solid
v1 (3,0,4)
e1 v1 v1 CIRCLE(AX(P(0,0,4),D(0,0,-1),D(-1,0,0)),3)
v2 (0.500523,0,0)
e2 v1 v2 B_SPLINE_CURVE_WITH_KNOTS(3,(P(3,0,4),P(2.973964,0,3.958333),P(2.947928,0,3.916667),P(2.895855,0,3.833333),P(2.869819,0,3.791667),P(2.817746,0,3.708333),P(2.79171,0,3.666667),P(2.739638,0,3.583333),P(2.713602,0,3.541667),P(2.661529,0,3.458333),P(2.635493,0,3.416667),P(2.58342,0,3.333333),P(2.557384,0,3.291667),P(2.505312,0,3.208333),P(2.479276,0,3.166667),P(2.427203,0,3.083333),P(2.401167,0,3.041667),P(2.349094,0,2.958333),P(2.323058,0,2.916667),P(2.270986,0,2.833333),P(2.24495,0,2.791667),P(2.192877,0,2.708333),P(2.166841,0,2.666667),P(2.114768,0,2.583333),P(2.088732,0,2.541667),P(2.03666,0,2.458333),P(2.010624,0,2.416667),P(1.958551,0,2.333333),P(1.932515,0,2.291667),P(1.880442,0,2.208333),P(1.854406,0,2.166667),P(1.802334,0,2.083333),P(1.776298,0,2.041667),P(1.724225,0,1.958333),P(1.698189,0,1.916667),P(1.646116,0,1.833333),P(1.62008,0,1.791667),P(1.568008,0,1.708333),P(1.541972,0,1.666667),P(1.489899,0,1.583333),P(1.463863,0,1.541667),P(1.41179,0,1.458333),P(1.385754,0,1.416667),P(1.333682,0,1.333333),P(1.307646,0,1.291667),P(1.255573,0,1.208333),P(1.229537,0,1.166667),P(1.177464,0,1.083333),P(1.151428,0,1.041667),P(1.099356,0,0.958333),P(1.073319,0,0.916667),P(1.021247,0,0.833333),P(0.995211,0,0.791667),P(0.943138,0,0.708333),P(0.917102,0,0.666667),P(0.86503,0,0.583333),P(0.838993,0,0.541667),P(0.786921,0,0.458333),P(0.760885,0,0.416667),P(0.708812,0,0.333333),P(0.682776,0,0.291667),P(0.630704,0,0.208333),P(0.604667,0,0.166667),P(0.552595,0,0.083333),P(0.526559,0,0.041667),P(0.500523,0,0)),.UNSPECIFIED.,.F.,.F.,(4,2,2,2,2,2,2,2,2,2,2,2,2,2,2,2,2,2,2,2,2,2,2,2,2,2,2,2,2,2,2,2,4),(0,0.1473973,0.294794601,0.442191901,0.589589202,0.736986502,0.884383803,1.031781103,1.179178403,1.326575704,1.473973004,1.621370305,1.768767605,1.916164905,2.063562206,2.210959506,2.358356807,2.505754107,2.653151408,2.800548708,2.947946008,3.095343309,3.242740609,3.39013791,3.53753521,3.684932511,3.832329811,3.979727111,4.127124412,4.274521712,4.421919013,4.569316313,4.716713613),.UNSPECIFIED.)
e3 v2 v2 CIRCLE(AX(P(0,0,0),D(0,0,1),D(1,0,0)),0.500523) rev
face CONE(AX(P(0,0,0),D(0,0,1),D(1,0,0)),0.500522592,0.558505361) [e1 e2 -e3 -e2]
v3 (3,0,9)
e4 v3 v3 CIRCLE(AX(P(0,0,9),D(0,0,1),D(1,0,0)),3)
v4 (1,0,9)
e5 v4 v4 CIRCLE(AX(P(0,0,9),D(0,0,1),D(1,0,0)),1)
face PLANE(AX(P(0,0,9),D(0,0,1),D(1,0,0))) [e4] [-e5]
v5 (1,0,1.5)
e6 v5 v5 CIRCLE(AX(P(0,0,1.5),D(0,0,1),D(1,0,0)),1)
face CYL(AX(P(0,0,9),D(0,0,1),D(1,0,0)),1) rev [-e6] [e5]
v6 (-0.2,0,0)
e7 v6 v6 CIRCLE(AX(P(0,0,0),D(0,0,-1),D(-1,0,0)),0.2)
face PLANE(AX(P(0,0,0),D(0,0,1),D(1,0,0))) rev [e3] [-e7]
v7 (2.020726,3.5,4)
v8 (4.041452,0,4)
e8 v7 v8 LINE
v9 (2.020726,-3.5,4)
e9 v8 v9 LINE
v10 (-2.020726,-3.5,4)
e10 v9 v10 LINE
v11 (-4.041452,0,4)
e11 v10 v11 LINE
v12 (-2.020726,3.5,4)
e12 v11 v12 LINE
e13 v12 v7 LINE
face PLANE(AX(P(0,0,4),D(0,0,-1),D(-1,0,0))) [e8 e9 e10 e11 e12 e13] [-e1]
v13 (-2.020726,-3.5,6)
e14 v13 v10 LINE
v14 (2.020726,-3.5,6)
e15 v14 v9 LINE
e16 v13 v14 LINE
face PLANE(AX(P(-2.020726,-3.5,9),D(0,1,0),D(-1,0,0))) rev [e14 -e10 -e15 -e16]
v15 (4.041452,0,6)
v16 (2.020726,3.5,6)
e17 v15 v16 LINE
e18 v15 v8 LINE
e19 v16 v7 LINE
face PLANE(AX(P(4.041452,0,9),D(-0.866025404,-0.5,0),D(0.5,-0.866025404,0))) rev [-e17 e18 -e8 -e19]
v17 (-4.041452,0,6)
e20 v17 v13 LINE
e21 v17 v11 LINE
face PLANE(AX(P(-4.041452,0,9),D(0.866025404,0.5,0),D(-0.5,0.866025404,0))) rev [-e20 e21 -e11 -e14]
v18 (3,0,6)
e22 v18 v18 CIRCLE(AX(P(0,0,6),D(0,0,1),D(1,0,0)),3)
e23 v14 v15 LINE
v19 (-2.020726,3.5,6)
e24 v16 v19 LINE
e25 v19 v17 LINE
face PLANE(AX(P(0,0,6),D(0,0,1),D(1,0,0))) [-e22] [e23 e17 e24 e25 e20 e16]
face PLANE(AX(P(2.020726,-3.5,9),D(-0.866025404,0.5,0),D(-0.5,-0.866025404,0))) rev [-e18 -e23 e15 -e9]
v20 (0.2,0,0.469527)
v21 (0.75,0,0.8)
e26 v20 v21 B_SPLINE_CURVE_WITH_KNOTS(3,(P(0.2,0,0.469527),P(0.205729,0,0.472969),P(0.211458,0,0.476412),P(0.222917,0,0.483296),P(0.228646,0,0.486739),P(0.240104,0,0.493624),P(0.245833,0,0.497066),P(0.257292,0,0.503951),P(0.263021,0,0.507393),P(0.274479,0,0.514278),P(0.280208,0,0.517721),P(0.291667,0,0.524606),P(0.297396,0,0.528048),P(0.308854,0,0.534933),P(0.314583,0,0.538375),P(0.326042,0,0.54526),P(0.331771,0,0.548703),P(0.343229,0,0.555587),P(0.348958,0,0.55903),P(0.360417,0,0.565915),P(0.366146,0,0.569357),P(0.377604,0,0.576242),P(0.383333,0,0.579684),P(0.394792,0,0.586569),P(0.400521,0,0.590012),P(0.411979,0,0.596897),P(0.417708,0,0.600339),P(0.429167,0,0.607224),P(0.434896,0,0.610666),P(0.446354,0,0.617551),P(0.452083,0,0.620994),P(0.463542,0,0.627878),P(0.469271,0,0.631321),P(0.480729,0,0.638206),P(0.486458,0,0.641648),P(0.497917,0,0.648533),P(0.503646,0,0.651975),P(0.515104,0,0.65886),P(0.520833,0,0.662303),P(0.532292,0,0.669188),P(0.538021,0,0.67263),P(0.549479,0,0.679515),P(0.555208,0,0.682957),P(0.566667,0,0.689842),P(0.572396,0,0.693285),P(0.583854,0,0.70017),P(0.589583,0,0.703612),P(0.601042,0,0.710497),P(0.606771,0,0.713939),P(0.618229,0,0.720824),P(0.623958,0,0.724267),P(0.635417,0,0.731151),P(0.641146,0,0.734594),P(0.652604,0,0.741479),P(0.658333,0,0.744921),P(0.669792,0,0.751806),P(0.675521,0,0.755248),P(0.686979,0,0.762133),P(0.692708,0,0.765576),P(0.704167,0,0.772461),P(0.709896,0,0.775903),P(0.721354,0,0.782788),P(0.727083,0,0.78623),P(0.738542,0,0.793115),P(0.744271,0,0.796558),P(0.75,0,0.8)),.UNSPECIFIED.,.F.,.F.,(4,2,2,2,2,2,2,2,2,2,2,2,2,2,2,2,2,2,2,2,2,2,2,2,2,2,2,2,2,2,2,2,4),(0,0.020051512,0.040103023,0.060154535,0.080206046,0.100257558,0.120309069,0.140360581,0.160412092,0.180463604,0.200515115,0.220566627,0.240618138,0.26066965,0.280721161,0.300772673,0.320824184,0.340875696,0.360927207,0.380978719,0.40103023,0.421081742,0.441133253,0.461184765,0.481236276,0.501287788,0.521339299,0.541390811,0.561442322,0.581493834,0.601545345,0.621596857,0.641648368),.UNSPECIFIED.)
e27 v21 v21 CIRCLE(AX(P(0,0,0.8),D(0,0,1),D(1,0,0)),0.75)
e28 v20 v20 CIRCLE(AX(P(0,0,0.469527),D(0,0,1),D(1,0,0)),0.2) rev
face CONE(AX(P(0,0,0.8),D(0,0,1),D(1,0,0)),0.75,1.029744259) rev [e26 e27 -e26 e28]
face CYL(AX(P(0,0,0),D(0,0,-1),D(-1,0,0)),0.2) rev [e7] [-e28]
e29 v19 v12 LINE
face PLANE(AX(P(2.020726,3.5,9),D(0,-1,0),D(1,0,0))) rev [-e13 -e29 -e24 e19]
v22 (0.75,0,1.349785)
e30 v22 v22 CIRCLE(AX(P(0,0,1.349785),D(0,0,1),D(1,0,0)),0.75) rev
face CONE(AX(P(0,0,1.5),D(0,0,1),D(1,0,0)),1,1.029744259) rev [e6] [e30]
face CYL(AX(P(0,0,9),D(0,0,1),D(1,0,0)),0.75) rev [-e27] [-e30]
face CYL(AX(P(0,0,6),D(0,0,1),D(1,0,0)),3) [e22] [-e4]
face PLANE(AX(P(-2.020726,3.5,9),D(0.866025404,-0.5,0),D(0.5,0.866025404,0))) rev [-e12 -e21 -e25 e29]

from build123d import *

# Parameters (mm, degrees)
BOSS_EXTRU_1_DEPTH                  = 9
ESQUISSE2_W                         = 15.557161579
ESQUISSE2_H                         = 11.468773674
ESQUISSE2_R                         = 3
ENL_V_MAT_EXTRU_1_DEPTH             = 3
DIAM_TRE_DU_PER_AGE_2_0_2_1_D       = 2
DIAM_TRE_DU_PER_AGE_2_0_2_1_DEPTH   = 7.5
DIAM_TRE_DU_PER_AGE_2_0_2_1_TIP     = 0.600860619
DIAM_TRE_DU_PER_AGE_1_5_1_5_1_D     = 1.5
DIAM_TRE_DU_PER_AGE_1_5_1_5_1_DEPTH = 8.2
DIAM_TRE_DU_PER_AGE_1_5_1_5_1_TIP   = 0.450645464
DIAM_TRE_DU_PER_AGE_0_4_0_4_1_D     = 0.4
DIAM_TRE_DU_PER_AGE_0_4_0_4_1_DEPTH = 0.7
DIAM_TRE_DU_PER_AGE_0_4_0_4_1_TIP   = 0.120172124
ENL_V_START                         = -4
ESQUISSE3_W                         = 15.323034965
ESQUISSE3_H                         = 11.861185192
ESQUISSE3_R                         = 3
ENL_V_MAT_EXTRU_3_DEPTH             = 4
CHANFREIN2_SIZE                     = 4
CHANFREIN2_SIZE_2                   = 2.499477408


with BuildPart() as part:
    # Esquisse1 → Boss.-Extru.1 (new body)
    with BuildSketch(Plane.XY):
        Polygon((4.041451884, 0), (2.020725942, 3.5), (-2.020725942, 3.5), (-4.041451884, 0), (-2.020725942, -3.5), (2.020725942, -3.5), align=None)
    extrude(amount=BOSS_EXTRU_1_DEPTH)

    # Esquisse2 → Enlèv. mat.-Extru.1 (cut)
    with BuildSketch(Plane.XY.offset(9)):
        with Locations((-0.212602531, -0.232116366)):
            Rectangle(ESQUISSE2_W, ESQUISSE2_H)
        Circle(ESQUISSE2_R, mode=Mode.SUBTRACT)
    extrude(amount=-ENL_V_MAT_EXTRU_1_DEPTH, mode=Mode.SUBTRACT)

    # Diamètre du perçage Ø2.0 (2)1
    with Locations(Plane.XY.offset(9)):
        with Locations((0, 0)):
            Hole(DIAM_TRE_DU_PER_AGE_2_0_2_1_D / 2, depth=DIAM_TRE_DU_PER_AGE_2_0_2_1_DEPTH)
            with Locations((0, 0, -(DIAM_TRE_DU_PER_AGE_2_0_2_1_DEPTH + DIAM_TRE_DU_PER_AGE_2_0_2_1_TIP / 2))):  # 118° drill point
                Cone(0, DIAM_TRE_DU_PER_AGE_2_0_2_1_D / 2, DIAM_TRE_DU_PER_AGE_2_0_2_1_TIP, mode=Mode.SUBTRACT)

    # Diamètre du perçage Ø1.5 (1.5)1
    with Locations(Plane.XY.offset(9)):
        with Locations((0, 0)):
            Hole(DIAM_TRE_DU_PER_AGE_1_5_1_5_1_D / 2, depth=DIAM_TRE_DU_PER_AGE_1_5_1_5_1_DEPTH)
            with Locations((0, 0, -(DIAM_TRE_DU_PER_AGE_1_5_1_5_1_DEPTH + DIAM_TRE_DU_PER_AGE_1_5_1_5_1_TIP / 2))):  # 118° drill point
                Cone(0, DIAM_TRE_DU_PER_AGE_1_5_1_5_1_D / 2, DIAM_TRE_DU_PER_AGE_1_5_1_5_1_TIP, mode=Mode.SUBTRACT)

    # Diamètre du perçage Ø0.4 (0.4)1
    with Locations(Plane(origin=(0, 0, 0), x_dir=(-1, 0, 0), z_dir=(0, 0, -1))):
        with Locations((0, 0)):
            Hole(DIAM_TRE_DU_PER_AGE_0_4_0_4_1_D / 2, depth=DIAM_TRE_DU_PER_AGE_0_4_0_4_1_DEPTH)
            with Locations((0, 0, -(DIAM_TRE_DU_PER_AGE_0_4_0_4_1_DEPTH + DIAM_TRE_DU_PER_AGE_0_4_0_4_1_TIP / 2))):  # 118° drill point
                Cone(0, DIAM_TRE_DU_PER_AGE_0_4_0_4_1_D / 2, DIAM_TRE_DU_PER_AGE_0_4_0_4_1_TIP, mode=Mode.SUBTRACT)

    # Esquisse3 → Enlèv. mat.-Extru.3 (cut)
    with BuildSketch(Plane(origin=(0, 0, 0), x_dir=(-1, 0, 0), z_dir=(0, 0, -1)).offset(ENL_V_START)):
        with Locations((0.20407301, -0.146192801)):
            Rectangle(ESQUISSE3_W, ESQUISSE3_H)
        with Locations(Location((0, 0, 0), (0, 0, 180))):
            Circle(ESQUISSE3_R, mode=Mode.SUBTRACT)
    extrude(amount=ENL_V_MAT_EXTRU_3_DEPTH, mode=Mode.SUBTRACT)

    # Chanfrein2
    # the kernel refuses this chamfer: 4, 2.499477408 mm, written as the material it takes off along each edge
    with BuildSketch(Plane(origin=(0, 0, 0), x_dir=(1, 0, 0), z_dir=(0, 1, 0))) as chanfrein2_piece_1_section:
        Polygon((3, -CHANFREIN2_SIZE), (3 - CHANFREIN2_SIZE_2, 0), (3, 0), align=None)
    chanfrein2_piece_1 = revolve(axis=Axis((0, 0, 0), (0, 0, -1)), mode=Mode.PRIVATE)
    chanfrein2_piece_1 = split(chanfrein2_piece_1, bisect_by=Plane(origin=(-1.744026904, 0, 4), z_dir=(0, 0, -1)), keep=Keep.TOP, mode=Mode.PRIVATE)
    add(chanfrein2_piece_1, mode=Mode.SUBTRACT)


solid = part.part
